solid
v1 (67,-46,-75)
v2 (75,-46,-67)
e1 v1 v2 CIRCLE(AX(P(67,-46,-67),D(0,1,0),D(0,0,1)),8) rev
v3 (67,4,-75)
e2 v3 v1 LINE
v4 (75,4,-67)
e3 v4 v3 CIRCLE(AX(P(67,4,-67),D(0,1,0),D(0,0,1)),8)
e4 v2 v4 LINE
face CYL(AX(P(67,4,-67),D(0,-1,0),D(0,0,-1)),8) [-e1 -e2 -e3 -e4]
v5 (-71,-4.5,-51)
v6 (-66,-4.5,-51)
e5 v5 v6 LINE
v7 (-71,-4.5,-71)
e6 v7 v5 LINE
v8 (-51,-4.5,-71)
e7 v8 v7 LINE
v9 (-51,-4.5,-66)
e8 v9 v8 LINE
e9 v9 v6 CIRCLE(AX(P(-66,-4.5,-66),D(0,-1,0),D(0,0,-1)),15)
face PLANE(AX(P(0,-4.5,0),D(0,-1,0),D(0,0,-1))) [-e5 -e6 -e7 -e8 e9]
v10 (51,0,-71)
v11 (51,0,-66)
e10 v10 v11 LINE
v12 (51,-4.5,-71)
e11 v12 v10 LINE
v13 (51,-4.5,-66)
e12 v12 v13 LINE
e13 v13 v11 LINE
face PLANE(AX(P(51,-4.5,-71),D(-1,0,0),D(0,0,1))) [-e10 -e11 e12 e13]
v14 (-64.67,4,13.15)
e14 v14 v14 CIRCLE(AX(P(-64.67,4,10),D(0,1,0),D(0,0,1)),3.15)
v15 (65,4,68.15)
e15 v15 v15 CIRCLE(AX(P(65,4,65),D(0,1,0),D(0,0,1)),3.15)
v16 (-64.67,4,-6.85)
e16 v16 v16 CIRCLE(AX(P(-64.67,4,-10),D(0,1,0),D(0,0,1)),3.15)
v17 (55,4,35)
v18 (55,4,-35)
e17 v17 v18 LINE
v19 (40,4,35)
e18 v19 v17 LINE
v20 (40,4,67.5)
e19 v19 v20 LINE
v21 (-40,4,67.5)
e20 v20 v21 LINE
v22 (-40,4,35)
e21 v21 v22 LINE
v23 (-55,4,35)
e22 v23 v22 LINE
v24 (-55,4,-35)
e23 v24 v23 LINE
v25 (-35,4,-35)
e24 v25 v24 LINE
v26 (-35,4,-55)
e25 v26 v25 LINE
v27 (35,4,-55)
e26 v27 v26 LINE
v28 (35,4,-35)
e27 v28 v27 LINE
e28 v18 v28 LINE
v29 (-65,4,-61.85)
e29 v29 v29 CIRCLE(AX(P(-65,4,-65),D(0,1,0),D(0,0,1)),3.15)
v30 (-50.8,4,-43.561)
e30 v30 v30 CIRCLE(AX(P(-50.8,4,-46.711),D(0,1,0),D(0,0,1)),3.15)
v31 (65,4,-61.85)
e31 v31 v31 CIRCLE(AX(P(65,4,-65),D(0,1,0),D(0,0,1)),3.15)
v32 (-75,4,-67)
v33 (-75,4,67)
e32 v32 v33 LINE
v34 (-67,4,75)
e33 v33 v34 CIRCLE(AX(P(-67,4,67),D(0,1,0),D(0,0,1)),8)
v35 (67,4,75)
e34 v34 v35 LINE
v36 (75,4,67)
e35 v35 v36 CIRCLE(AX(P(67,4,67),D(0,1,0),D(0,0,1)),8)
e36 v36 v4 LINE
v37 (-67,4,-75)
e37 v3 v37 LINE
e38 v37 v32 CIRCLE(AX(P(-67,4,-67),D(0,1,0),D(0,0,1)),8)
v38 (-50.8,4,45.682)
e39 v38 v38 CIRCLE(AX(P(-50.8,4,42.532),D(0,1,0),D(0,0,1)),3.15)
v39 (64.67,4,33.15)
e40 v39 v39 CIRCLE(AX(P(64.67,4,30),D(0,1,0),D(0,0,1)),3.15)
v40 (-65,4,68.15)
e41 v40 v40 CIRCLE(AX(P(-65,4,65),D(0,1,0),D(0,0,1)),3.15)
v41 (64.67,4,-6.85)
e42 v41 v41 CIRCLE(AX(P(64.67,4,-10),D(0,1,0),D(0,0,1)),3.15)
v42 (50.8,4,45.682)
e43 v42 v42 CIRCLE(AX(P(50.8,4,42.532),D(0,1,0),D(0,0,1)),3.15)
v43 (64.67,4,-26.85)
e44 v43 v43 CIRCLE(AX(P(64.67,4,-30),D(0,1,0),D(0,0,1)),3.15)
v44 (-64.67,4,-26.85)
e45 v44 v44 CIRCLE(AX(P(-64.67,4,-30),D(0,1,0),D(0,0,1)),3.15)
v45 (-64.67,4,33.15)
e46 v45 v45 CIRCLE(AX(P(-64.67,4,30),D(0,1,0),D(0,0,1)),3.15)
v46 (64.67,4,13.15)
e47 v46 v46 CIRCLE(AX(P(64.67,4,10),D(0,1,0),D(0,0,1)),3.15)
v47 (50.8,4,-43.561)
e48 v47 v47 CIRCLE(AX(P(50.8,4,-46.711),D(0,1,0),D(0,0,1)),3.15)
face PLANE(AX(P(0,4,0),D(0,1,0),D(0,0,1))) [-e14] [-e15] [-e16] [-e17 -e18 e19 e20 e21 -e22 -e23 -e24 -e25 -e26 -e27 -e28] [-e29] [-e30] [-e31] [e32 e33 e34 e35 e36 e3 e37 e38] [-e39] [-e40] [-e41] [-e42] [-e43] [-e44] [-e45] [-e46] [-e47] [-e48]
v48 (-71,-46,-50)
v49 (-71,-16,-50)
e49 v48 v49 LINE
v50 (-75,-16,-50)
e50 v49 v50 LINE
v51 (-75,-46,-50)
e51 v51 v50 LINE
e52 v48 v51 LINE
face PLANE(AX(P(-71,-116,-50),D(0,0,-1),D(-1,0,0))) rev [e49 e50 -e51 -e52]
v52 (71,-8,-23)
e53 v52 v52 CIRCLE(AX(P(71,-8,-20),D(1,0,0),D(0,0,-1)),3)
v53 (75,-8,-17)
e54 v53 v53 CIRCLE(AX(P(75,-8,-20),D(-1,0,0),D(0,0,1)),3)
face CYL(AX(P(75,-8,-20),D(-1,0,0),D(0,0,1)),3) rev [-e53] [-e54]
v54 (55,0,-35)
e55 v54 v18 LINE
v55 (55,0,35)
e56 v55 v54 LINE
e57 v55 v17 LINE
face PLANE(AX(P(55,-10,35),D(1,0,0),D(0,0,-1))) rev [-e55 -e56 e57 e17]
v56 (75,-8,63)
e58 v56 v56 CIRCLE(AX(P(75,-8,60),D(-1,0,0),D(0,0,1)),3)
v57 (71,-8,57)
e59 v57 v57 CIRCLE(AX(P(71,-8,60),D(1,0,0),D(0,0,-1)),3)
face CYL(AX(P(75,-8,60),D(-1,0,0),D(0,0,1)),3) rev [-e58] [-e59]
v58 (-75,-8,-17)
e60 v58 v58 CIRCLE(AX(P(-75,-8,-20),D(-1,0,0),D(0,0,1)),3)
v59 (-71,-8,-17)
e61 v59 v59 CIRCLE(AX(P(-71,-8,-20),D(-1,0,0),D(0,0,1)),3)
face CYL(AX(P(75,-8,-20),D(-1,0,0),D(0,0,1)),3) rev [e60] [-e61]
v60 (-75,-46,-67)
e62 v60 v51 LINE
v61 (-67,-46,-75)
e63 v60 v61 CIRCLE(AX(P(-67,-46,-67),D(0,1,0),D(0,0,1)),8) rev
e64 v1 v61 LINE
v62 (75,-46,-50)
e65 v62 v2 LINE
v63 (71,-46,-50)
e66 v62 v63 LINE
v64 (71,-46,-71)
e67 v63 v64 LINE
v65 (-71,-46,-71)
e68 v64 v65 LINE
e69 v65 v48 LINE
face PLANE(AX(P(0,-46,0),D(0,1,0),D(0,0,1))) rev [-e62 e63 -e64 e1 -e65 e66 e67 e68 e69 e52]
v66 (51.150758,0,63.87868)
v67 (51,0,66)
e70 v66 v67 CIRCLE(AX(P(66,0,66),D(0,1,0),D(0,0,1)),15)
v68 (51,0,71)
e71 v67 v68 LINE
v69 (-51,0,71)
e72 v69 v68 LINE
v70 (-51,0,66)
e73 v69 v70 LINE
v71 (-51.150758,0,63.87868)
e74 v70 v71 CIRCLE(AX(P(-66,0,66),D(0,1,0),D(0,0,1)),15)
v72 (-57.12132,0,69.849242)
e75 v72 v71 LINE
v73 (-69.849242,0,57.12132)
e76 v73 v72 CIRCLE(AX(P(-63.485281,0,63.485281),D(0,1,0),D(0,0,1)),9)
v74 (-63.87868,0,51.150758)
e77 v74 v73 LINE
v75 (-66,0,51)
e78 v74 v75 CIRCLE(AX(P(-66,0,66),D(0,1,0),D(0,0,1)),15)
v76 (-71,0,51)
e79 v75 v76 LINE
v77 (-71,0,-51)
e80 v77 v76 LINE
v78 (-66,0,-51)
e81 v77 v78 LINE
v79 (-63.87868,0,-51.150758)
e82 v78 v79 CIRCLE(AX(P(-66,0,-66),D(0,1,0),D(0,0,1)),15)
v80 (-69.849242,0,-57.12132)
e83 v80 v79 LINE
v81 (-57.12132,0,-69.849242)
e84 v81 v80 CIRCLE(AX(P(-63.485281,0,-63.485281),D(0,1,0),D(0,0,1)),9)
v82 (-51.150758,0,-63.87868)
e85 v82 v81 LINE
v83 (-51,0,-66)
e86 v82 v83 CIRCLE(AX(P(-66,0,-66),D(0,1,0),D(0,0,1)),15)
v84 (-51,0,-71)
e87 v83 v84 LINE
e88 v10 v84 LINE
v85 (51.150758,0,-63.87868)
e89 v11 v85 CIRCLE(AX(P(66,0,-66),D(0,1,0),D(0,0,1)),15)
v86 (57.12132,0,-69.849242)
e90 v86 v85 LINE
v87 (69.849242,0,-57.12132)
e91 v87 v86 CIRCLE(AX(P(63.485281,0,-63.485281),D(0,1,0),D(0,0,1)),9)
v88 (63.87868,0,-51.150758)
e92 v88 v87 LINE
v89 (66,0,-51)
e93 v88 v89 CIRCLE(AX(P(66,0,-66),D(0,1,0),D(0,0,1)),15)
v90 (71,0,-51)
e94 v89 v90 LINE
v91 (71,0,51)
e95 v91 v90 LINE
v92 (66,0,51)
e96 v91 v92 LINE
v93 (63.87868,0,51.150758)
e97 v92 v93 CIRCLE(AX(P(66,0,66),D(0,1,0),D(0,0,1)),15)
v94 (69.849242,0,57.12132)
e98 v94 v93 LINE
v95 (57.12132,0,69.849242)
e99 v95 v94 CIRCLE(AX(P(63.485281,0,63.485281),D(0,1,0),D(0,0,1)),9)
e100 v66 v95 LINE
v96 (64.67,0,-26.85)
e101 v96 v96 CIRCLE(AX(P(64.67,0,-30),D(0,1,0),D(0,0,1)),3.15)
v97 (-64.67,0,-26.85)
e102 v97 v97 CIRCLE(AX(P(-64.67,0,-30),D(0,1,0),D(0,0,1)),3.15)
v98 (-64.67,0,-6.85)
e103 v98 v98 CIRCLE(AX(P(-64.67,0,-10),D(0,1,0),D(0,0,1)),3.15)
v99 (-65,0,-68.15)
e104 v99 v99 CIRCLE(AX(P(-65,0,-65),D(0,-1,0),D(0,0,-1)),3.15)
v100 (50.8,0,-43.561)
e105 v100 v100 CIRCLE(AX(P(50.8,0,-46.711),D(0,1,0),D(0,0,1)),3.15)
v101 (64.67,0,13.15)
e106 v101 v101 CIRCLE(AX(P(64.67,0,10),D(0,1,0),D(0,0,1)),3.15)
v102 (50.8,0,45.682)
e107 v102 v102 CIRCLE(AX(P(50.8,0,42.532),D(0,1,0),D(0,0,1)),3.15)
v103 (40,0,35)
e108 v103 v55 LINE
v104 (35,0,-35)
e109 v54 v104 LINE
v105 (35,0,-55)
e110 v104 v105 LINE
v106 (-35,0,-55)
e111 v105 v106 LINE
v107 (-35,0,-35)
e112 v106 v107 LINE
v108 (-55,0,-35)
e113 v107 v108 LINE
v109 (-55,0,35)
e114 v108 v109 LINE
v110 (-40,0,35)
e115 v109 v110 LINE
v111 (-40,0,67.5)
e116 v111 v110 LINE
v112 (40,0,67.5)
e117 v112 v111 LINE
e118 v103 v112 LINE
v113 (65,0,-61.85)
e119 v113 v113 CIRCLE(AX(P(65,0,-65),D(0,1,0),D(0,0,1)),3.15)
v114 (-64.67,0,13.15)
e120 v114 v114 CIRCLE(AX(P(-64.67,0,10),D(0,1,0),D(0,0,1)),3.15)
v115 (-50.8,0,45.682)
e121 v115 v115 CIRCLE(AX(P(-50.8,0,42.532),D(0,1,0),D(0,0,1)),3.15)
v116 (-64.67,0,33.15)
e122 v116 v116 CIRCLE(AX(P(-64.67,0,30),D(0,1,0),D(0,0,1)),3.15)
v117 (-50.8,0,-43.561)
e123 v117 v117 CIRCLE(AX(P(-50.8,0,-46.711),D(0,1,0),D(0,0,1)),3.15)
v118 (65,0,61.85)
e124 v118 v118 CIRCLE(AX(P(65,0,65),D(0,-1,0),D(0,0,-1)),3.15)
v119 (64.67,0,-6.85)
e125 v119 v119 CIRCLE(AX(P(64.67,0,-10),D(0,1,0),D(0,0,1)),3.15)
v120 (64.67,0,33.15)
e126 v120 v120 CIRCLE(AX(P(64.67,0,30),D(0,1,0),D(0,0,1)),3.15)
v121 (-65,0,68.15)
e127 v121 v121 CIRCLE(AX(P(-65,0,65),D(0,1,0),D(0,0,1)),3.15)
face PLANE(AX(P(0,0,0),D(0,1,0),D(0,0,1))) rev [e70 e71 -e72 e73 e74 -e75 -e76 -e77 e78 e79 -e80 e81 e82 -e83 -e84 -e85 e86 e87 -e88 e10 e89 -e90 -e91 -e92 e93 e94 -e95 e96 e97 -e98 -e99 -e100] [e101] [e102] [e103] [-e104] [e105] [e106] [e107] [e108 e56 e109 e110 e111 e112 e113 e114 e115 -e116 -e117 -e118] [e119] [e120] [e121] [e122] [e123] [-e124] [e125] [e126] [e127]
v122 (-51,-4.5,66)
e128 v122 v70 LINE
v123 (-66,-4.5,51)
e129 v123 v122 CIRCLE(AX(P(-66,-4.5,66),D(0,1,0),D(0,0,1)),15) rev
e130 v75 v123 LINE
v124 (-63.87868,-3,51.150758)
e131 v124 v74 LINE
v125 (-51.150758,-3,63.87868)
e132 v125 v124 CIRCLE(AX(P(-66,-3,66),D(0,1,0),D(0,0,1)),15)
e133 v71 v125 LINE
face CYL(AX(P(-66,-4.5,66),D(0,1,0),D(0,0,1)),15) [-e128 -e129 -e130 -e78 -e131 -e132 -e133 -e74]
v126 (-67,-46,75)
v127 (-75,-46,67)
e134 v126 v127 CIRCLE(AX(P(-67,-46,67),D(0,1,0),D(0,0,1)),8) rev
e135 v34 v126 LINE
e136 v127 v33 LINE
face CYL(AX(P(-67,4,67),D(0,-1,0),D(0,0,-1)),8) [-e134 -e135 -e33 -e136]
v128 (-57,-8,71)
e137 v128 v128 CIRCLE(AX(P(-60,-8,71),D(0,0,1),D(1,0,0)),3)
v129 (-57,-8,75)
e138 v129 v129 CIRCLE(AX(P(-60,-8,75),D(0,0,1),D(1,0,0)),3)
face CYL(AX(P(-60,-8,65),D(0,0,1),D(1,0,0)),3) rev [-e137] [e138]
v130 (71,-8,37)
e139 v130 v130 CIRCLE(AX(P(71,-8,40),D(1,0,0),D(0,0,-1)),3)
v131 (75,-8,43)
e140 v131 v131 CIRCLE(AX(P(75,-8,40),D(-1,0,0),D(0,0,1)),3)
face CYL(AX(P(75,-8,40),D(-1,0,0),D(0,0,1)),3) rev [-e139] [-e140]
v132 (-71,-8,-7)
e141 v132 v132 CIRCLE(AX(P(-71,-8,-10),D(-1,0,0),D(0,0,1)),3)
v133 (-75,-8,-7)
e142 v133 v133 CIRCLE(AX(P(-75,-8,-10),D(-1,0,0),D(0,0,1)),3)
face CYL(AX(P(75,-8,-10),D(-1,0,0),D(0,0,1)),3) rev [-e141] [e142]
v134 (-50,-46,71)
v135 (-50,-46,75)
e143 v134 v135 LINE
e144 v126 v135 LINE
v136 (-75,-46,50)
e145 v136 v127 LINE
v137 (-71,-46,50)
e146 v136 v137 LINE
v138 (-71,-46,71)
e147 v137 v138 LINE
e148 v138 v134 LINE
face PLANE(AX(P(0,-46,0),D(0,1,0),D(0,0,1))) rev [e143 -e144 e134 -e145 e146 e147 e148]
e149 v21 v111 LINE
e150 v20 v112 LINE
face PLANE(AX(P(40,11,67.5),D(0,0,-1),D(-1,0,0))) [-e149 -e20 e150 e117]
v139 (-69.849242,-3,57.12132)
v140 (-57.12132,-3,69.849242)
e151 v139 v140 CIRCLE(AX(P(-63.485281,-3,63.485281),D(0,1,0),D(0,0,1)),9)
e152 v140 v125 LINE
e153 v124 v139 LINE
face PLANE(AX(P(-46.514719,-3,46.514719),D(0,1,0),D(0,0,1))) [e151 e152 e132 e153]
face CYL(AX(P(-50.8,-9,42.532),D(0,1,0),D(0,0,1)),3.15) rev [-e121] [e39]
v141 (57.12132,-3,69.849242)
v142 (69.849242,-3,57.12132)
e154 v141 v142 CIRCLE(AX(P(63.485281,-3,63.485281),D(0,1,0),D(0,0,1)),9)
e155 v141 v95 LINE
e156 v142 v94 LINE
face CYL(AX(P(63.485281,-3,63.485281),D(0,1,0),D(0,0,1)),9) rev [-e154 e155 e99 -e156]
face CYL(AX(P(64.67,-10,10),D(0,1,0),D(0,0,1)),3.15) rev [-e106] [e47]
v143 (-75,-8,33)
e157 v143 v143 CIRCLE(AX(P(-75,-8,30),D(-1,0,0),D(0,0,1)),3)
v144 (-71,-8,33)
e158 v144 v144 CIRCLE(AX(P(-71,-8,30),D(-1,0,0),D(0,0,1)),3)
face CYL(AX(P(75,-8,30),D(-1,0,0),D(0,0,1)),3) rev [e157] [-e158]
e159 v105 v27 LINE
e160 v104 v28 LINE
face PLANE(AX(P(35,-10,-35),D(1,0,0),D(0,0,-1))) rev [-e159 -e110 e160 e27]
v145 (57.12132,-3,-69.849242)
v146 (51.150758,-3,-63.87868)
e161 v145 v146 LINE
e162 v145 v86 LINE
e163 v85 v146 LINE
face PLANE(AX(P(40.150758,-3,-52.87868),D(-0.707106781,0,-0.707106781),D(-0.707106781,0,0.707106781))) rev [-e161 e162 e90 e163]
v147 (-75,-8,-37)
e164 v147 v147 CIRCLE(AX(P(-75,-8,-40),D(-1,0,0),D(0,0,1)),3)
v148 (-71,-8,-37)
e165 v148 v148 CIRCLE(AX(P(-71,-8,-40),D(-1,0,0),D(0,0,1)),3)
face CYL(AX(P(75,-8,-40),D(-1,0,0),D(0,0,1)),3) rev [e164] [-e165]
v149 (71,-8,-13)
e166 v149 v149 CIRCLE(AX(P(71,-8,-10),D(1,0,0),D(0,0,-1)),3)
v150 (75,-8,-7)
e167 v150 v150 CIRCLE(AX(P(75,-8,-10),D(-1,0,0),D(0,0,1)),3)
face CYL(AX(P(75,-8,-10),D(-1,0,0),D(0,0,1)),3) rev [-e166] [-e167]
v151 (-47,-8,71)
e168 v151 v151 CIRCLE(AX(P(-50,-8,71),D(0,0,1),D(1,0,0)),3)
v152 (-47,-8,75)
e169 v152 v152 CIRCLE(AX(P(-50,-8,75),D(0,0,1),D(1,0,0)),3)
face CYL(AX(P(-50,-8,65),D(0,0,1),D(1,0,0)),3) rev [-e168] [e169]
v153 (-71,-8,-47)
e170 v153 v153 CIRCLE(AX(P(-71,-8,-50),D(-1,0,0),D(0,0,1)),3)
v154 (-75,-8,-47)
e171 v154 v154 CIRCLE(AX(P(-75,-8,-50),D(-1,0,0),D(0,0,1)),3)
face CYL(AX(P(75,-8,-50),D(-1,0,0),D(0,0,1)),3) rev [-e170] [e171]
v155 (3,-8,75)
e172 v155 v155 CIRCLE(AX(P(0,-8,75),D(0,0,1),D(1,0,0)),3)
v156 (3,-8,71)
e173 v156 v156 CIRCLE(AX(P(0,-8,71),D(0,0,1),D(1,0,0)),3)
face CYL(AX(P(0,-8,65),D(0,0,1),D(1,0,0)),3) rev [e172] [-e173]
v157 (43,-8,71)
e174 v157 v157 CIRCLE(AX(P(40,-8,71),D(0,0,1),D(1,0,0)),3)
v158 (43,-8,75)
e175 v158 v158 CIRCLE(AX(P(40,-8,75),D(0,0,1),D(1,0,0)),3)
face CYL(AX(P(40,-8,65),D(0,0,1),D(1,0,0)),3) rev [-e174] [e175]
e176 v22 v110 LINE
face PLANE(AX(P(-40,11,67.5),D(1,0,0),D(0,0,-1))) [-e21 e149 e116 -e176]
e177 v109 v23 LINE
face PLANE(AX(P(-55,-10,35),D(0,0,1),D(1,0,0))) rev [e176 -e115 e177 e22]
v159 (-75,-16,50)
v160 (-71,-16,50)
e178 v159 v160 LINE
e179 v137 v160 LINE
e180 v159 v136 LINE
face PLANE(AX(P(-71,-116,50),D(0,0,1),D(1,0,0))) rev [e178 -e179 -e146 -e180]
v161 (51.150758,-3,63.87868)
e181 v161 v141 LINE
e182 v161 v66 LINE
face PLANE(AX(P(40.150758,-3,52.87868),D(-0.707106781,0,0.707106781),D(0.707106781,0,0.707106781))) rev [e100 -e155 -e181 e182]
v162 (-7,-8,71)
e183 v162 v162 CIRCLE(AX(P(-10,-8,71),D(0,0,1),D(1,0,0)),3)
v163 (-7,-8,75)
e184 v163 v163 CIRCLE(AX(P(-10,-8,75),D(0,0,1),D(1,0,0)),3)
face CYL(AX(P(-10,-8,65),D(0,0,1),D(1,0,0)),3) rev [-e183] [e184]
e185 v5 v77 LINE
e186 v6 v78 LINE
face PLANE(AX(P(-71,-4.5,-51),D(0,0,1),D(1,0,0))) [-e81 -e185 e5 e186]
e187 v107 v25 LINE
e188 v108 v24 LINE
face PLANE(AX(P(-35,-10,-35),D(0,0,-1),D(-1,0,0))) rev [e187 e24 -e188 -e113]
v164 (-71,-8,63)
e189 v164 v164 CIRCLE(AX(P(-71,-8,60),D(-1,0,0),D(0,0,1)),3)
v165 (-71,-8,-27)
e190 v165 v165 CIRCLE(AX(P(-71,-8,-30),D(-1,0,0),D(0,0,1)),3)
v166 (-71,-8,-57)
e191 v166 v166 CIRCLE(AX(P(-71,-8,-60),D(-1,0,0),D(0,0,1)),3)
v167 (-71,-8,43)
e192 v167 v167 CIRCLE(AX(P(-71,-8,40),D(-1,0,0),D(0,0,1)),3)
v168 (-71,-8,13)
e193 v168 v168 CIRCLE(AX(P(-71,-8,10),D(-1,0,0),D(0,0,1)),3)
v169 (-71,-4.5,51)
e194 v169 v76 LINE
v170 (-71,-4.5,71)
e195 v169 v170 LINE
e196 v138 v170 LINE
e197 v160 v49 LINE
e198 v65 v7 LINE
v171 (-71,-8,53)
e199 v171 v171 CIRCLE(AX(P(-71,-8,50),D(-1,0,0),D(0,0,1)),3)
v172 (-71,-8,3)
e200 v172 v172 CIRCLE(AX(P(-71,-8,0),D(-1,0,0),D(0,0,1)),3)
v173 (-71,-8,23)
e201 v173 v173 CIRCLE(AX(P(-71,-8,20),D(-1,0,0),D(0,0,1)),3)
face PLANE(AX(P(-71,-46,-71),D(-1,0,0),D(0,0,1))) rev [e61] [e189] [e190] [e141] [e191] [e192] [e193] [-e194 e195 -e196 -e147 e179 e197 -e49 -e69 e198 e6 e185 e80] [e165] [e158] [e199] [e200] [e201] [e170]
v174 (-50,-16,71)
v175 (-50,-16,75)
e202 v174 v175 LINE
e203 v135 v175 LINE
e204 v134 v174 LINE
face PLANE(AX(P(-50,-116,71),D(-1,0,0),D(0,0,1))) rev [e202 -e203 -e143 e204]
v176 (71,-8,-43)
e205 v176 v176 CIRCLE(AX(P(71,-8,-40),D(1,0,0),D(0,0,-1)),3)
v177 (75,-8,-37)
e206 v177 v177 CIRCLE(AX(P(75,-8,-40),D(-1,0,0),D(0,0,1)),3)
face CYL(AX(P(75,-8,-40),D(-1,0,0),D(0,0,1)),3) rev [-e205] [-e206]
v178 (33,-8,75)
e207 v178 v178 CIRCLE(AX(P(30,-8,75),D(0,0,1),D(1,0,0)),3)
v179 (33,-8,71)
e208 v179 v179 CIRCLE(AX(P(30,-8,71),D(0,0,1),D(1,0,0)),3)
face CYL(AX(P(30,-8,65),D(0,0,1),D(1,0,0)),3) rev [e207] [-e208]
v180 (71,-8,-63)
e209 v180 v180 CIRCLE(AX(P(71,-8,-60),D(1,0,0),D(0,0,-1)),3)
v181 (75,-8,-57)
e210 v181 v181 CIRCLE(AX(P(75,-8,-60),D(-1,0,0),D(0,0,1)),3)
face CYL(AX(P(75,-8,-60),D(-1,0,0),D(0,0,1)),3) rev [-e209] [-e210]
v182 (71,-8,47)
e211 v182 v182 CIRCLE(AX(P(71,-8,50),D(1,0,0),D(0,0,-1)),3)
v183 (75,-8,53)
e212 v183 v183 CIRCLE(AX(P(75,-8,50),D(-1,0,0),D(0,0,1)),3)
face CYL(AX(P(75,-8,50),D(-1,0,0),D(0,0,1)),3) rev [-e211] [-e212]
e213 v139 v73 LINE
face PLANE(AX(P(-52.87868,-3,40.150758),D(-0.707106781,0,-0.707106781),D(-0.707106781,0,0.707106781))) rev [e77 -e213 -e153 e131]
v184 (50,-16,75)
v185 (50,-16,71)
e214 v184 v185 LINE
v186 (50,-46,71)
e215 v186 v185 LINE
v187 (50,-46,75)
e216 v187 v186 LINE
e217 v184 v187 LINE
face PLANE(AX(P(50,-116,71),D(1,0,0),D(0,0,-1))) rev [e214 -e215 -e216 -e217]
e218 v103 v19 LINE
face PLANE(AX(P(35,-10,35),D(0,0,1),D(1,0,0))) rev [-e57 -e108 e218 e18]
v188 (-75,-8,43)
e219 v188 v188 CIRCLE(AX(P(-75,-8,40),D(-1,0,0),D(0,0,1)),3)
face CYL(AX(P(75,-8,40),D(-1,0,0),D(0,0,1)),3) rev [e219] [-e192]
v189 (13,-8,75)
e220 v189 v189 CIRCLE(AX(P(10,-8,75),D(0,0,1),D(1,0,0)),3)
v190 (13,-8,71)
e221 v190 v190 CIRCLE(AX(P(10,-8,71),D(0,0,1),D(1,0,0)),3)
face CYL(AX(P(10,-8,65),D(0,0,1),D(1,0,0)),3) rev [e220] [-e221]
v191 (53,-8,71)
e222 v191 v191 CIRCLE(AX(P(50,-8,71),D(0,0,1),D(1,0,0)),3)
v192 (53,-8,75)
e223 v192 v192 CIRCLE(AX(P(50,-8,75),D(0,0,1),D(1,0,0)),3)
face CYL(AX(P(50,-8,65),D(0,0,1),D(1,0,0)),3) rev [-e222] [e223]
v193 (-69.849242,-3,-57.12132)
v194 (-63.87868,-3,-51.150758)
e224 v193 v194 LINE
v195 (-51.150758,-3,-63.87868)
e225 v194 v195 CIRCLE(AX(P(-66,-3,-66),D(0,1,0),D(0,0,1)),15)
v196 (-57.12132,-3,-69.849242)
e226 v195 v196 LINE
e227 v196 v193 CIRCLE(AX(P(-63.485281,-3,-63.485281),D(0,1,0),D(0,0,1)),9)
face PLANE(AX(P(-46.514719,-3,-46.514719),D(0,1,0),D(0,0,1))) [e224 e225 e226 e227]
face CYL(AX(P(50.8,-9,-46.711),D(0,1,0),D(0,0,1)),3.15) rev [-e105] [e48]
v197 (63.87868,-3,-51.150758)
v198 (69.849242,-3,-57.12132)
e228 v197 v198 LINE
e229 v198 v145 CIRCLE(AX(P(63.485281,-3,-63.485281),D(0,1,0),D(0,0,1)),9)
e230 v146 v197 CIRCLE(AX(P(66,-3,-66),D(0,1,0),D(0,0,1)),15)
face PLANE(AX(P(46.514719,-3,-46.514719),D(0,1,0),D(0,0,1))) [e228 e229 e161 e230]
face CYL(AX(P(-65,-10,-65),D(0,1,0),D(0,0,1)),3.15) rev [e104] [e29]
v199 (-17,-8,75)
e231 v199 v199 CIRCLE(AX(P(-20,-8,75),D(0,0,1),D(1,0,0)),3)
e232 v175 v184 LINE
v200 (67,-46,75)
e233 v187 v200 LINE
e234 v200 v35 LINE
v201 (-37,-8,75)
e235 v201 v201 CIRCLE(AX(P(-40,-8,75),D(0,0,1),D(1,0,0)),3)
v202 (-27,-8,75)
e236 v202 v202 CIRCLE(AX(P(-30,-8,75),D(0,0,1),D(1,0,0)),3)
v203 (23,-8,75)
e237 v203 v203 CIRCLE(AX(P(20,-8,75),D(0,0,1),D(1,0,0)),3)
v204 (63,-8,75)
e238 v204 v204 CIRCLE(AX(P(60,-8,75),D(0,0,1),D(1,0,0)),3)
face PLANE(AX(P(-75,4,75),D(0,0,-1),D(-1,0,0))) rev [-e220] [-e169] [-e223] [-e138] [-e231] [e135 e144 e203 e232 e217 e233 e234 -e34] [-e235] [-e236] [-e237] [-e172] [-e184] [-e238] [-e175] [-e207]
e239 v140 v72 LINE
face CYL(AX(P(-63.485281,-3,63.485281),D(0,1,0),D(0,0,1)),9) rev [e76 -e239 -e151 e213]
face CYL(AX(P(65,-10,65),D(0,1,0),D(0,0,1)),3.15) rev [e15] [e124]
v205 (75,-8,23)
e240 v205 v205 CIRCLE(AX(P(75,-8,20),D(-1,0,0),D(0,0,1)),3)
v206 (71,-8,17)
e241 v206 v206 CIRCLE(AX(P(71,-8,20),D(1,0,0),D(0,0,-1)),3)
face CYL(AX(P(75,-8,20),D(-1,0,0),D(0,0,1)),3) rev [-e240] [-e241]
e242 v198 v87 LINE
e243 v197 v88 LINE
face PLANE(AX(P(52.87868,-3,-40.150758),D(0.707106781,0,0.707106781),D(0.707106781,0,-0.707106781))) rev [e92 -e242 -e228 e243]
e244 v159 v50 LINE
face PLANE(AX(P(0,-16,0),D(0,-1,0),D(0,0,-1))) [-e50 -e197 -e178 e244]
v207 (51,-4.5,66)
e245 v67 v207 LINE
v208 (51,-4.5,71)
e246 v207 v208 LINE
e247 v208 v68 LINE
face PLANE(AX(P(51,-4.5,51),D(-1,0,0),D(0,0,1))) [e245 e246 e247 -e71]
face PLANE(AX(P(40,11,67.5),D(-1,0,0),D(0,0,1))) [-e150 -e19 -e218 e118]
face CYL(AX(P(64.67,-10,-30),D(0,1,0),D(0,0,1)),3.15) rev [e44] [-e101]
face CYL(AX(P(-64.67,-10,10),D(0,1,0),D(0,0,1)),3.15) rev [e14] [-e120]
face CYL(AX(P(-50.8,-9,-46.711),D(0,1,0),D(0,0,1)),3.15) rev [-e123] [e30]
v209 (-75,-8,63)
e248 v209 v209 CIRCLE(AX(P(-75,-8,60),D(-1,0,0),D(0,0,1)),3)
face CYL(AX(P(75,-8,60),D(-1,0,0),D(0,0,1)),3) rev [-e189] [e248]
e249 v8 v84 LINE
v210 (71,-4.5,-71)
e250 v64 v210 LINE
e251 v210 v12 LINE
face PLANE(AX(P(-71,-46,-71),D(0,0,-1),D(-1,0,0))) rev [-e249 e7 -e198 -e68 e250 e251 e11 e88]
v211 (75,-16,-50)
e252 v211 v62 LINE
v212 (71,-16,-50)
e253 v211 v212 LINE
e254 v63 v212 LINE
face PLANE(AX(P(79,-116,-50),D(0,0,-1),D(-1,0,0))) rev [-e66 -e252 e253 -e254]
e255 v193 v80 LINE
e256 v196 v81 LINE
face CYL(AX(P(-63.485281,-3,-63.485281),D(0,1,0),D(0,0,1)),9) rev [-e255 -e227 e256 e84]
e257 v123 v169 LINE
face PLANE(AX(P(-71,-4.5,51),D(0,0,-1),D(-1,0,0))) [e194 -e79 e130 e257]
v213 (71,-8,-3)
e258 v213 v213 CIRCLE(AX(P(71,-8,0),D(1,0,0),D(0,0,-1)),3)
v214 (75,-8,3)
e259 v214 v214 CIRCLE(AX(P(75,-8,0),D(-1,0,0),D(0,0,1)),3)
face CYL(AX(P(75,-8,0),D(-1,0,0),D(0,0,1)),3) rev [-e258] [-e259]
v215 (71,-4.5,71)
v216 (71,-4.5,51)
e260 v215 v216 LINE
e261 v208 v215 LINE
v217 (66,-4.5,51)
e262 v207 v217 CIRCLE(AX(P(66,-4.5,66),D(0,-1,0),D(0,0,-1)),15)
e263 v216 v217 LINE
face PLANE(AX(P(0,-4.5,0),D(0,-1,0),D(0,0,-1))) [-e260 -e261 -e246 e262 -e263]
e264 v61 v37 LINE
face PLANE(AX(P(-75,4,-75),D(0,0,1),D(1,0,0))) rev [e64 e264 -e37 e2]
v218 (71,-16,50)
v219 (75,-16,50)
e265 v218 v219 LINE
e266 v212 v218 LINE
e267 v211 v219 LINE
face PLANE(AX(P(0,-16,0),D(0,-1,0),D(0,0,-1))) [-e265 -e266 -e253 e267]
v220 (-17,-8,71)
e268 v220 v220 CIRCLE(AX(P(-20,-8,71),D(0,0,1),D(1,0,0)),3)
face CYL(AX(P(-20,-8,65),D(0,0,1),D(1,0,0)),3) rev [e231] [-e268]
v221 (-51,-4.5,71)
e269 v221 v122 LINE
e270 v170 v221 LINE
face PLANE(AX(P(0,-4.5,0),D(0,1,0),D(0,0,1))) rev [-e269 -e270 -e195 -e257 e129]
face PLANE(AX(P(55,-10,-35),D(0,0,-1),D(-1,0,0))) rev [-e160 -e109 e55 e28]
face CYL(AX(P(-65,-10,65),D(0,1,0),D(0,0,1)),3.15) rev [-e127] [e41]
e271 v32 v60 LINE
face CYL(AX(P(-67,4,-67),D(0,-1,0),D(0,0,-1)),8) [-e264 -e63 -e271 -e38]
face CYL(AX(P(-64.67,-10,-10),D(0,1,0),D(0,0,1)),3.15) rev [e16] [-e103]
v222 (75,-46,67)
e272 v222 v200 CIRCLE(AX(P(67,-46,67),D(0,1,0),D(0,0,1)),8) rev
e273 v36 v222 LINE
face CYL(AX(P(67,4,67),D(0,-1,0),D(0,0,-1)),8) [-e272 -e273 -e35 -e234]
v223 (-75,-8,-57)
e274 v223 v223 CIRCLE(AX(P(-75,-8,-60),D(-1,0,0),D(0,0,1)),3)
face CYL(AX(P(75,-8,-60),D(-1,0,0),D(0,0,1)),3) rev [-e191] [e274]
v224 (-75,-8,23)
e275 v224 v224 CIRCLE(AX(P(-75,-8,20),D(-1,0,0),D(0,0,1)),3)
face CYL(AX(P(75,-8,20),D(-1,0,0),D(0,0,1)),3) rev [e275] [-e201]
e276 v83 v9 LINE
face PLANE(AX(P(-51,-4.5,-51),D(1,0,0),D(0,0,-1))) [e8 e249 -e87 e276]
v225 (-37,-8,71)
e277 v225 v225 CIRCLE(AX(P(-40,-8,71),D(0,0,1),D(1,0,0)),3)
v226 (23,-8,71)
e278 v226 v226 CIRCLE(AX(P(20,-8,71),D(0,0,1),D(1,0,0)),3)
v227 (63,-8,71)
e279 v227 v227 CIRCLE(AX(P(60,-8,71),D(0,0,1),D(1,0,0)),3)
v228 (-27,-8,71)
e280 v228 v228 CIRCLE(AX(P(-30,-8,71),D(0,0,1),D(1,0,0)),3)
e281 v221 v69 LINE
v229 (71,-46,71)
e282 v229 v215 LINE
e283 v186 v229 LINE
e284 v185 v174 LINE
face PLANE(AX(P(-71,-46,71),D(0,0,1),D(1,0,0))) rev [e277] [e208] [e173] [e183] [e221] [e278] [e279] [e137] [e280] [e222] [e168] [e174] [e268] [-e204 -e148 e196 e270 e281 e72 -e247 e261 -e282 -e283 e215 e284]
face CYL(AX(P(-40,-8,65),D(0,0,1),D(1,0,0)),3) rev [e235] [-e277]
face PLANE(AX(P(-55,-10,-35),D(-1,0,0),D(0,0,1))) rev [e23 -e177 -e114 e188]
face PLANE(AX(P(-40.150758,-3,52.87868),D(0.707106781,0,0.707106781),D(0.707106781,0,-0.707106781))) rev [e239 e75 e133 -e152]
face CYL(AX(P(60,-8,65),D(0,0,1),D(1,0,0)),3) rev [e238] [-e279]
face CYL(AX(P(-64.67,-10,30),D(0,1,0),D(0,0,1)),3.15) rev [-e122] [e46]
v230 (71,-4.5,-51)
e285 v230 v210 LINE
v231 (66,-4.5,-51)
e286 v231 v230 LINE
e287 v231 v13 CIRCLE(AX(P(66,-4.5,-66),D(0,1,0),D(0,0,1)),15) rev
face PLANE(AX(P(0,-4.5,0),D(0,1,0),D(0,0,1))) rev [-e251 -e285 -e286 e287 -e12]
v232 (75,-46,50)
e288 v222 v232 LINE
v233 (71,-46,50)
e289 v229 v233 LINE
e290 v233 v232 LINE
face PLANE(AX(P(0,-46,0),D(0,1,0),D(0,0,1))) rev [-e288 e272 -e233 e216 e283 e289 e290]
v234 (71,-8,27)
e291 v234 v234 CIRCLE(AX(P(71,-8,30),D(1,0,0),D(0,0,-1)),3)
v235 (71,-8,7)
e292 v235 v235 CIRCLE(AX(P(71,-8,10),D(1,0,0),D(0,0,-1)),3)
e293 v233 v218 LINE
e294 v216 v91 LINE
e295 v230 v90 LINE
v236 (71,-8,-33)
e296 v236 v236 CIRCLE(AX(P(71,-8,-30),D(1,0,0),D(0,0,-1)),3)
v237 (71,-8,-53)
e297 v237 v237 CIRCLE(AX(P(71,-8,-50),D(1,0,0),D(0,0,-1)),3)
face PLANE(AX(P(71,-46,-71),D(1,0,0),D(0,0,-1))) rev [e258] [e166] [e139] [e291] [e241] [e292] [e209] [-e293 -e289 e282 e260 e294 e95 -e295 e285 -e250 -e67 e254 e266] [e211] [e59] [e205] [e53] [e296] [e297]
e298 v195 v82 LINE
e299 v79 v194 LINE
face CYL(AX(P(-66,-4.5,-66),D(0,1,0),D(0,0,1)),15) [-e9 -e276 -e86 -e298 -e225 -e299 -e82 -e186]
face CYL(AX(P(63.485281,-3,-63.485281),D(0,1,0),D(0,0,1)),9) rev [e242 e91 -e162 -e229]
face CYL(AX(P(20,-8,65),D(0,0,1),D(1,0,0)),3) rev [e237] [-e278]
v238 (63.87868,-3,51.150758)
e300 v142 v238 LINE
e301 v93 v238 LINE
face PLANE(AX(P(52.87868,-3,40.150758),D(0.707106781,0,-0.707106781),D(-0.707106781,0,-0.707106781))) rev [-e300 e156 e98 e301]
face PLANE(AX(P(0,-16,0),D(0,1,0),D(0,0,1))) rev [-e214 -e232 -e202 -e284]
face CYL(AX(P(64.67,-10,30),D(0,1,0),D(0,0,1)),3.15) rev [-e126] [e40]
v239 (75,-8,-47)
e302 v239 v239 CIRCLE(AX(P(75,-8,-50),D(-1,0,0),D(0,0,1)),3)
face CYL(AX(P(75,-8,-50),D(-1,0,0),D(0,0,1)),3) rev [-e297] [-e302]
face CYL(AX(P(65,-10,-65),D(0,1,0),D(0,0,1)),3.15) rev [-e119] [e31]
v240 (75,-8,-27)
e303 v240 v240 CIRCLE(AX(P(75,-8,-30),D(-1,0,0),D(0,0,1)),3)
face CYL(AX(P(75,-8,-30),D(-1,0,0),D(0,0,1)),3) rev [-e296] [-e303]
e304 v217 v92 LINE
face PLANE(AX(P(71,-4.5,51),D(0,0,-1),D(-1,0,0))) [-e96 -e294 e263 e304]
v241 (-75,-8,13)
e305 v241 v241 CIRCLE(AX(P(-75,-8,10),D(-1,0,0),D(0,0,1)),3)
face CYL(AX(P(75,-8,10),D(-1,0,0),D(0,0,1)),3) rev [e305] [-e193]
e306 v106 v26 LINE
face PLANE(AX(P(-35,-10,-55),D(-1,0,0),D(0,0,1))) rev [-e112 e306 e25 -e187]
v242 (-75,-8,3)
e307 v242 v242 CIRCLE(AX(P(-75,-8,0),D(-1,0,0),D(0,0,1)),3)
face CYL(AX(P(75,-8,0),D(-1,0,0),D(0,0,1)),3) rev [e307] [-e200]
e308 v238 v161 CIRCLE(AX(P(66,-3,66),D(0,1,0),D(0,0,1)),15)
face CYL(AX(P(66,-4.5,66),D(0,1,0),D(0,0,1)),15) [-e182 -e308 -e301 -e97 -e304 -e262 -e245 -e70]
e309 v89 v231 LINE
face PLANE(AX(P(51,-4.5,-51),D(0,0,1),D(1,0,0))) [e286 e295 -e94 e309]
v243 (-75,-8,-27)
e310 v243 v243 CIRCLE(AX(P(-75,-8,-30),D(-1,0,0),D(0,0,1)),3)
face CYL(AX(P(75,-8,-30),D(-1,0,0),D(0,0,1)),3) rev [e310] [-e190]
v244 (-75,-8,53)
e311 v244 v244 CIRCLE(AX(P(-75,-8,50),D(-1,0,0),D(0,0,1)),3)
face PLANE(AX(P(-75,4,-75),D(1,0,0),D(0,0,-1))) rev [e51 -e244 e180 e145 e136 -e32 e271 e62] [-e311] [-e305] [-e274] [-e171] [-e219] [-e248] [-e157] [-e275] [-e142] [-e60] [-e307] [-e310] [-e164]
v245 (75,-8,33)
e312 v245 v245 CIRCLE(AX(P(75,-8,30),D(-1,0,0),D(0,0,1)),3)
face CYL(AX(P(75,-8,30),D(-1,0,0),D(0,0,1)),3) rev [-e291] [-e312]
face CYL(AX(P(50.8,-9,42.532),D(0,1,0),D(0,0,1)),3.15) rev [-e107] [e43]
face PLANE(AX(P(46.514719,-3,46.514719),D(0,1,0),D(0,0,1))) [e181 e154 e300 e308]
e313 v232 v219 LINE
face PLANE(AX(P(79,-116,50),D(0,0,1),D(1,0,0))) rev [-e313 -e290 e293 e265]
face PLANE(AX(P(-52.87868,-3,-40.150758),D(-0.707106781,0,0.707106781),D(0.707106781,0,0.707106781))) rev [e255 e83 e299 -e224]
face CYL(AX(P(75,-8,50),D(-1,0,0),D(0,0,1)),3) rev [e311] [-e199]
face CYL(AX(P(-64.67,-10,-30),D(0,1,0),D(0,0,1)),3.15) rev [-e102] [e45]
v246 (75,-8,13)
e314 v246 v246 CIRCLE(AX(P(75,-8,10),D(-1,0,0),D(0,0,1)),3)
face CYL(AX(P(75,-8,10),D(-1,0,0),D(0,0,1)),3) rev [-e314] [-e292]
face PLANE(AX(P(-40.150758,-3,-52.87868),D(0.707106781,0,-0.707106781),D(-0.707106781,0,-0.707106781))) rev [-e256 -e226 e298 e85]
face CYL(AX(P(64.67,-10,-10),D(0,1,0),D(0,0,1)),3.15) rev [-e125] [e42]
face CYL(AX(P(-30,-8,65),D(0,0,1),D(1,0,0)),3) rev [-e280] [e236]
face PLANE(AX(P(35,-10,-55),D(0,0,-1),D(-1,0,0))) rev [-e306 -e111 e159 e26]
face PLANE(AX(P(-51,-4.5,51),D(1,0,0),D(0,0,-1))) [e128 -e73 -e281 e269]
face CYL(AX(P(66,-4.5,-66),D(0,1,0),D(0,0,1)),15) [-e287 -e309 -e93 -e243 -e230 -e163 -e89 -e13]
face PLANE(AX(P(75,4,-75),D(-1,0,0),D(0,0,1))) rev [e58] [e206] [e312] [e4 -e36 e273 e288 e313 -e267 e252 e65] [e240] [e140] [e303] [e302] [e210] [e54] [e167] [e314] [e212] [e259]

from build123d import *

# Parameters (mm, degrees)
SKETCH9_R                 = 3.15
BOSS_EXTRUDE10_DEPTH      = 10
BOSS_EXTRUDE10_2_DEPTH    = 10
BOSS_EXTRUDE10_3_DEPTH    = 10
BOSS_EXTRUDE10_4_DEPTH    = 10
BOSS_EXTRUDE10_5_DEPTH    = 10
BOSS_EXTRUDE10_6_DEPTH    = 10
BOSS_EXTRUDE10_7_DEPTH    = 10
BOSS_EXTRUDE10_8_DEPTH    = 10
BOSS_EXTRUDE12_DEPTH      = 10
SKETCH15_R                = 3.15
BOSS_EXTRUDE17_DEPTH      = 10
BOSS_EXTRUDE17_2_DEPTH    = 10
BOSS_EXTRUDE17_3_DEPTH    = 10
BOSS_EXTRUDE17_4_DEPTH    = 10
SKETCH22_W                = 150
SKETCH22_H                = 150
BOSS_EXTRUDE19_DEPTH      = 4
SKETCH29_W                = 150
SKETCH29_H                = 150
SKETCH29_W_2              = 142
SKETCH29_H_2              = 142
BOSS_EXTRUDE20_DEPTH      = 50
FILLET12_R                = 8
BOSS_EXTRUDE21_START      = -20
SKETCH31_W                = 8
SKETCH31_H                = 100
BOSS_EXTRUDE21_DEPTH      = 100
BOSS_EXTRUDE21_2_DEPTH    = 100
SKETCH31_W_2              = 100
SKETCH31_H_2              = 8
BOSS_EXTRUDE21_3_DEPTH    = 100
SKETCH35_R                = 3.15
BOSS_EXTRUDE25_DEPTH      = 10
BOSS_EXTRUDE25_2_DEPTH    = 10
BOSS_EXTRUDE25_3_DEPTH    = 10
BOSS_EXTRUDE25_4_DEPTH    = 10
BOSS_EXTRUDE27_DEPTH      = 11
BOSS_EXTRUDE27_DEPTH_BACK = 46
SKETCH38_W                = 80
SKETCH38_H                = 35.561756734
BOSS_EXTRUDE28_DEPTH      = 3
BOSS_EXTRUDE28_2_DEPTH    = 3
BOSS_EXTRUDE28_3_DEPTH    = 3
BOSS_EXTRUDE28_4_DEPTH    = 3
SKETCH40_W                = 20
SKETCH40_H                = 20
BOSS_EXTRUDE31_DEPTH      = 4.5
BOSS_EXTRUDE31_2_DEPTH    = 4.5
BOSS_EXTRUDE31_3_DEPTH    = 4.5
BOSS_EXTRUDE31_4_DEPTH    = 4.5
FILLET14_R                = 15
SKETCH42_R                = 3
CUT_EXTRUDE1_DEPTH        = 10
SKETCH45_R                = 3
CUT_EXTRUDE2_DEPTH        = 174.899396204


with BuildPart() as part:
    # Sketch9 → Boss-Extrude10 (new, symmetric)
    with BuildSketch(Plane(origin=(0, 0, 0), x_dir=(1, 0, 0), z_dir=(0, 1, 0))):
        with Locations(Location((64.67, -30, 0), (0, 0, 270))):
            Circle(SKETCH9_R)
    extrude(amount=BOSS_EXTRUDE10_DEPTH, both=True)


with BuildPart() as body_2:
    # Sketch9 → Boss-Extrude10 2 (new, symmetric)
    with BuildSketch(Plane(origin=(0, 0, 0), x_dir=(1, 0, 0), z_dir=(0, 1, 0))):
        with Locations(Location((-64.67, -30, 0), (0, 0, 270))):
            Circle(SKETCH9_R)
    extrude(amount=BOSS_EXTRUDE10_2_DEPTH, both=True)


with BuildPart() as body_3:
    # Sketch9 → Boss-Extrude10 3 (new, symmetric)
    with BuildSketch(Plane(origin=(0, 0, 0), x_dir=(1, 0, 0), z_dir=(0, 1, 0))):
        with Locations(Location((64.67, -10, 0), (0, 0, 270))):
            Circle(SKETCH9_R)
    extrude(amount=BOSS_EXTRUDE10_3_DEPTH, both=True)


with BuildPart() as body_4:
    # Sketch9 → Boss-Extrude10 4 (new, symmetric)
    with BuildSketch(Plane(origin=(0, 0, 0), x_dir=(1, 0, 0), z_dir=(0, 1, 0))):
        with Locations(Location((-64.67, -10, 0), (0, 0, 270))):
            Circle(SKETCH9_R)
    extrude(amount=BOSS_EXTRUDE10_4_DEPTH, both=True)


with BuildPart() as body_5:
    # Sketch9 → Boss-Extrude10 5 (new, symmetric)
    with BuildSketch(Plane(origin=(0, 0, 0), x_dir=(1, 0, 0), z_dir=(0, 1, 0))):
        with Locations(Location((64.67, 10, 0), (0, 0, 270))):
            Circle(SKETCH9_R)
    extrude(amount=BOSS_EXTRUDE10_5_DEPTH, both=True)


with BuildPart() as body_6:
    # Sketch9 → Boss-Extrude10 6 (new, symmetric)
    with BuildSketch(Plane(origin=(0, 0, 0), x_dir=(1, 0, 0), z_dir=(0, 1, 0))):
        with Locations(Location((-64.67, 10, 0), (0, 0, 270))):
            Circle(SKETCH9_R)
    extrude(amount=BOSS_EXTRUDE10_6_DEPTH, both=True)


with BuildPart() as body_7:
    # Sketch9 → Boss-Extrude10 7 (new, symmetric)
    with BuildSketch(Plane(origin=(0, 0, 0), x_dir=(1, 0, 0), z_dir=(0, 1, 0))):
        with Locations(Location((64.67, 30, 0), (0, 0, 270))):
            Circle(SKETCH9_R)
    extrude(amount=BOSS_EXTRUDE10_7_DEPTH, both=True)


with BuildPart() as body_8:
    # Sketch9 → Boss-Extrude10 8 (new, symmetric)
    with BuildSketch(Plane(origin=(0, 0, 0), x_dir=(1, 0, 0), z_dir=(0, 1, 0))):
        with Locations(Location((-64.67, 30, 0), (0, 0, 270))):
            Circle(SKETCH9_R)
    extrude(amount=BOSS_EXTRUDE10_8_DEPTH, both=True)


with BuildPart() as body_9:
    # Sketch10 → Boss-Extrude12 (new, symmetric)
    with BuildSketch(Plane(origin=(0, 0, 0), x_dir=(1, 0, 0), z_dir=(0, 1, 0))):
        Polygon((35, -55), (35, -35), (55, -35), (55, 35), (35, 35), (35, 55), (-35, 55), (-35, 35), (-55, 35), (-55, -35), (-35, -35), (-35, -55), align=None)
    extrude(amount=BOSS_EXTRUDE12_DEPTH, both=True)


with BuildPart() as body_10:
    # Sketch15 → Boss-Extrude17 (new, symmetric)
    with BuildSketch(Plane(origin=(0, 0, 0), x_dir=(1, 0, 0), z_dir=(0, 1, 0))):
        with Locations(Location((-50.8, 46.711, 0), (0, 0, 270))):
            Circle(SKETCH15_R)
    extrude(amount=BOSS_EXTRUDE17_DEPTH, both=True)


with BuildPart() as body_11:
    # Sketch15 → Boss-Extrude17 2 (new, symmetric)
    with BuildSketch(Plane(origin=(0, 0, 0), x_dir=(1, 0, 0), z_dir=(0, 1, 0))):
        with Locations(Location((50.8, -42.532, 0), (0, 0, 270))):
            Circle(SKETCH15_R)
    extrude(amount=BOSS_EXTRUDE17_2_DEPTH, both=True)


with BuildPart() as body_12:
    # Sketch15 → Boss-Extrude17 3 (new, symmetric)
    with BuildSketch(Plane(origin=(0, 0, 0), x_dir=(1, 0, 0), z_dir=(0, 1, 0))):
        with Locations(Location((-50.8, -42.532, 0), (0, 0, 270))):
            Circle(SKETCH15_R)
    extrude(amount=BOSS_EXTRUDE17_3_DEPTH, both=True)


with BuildPart() as body_13:
    # Sketch15 → Boss-Extrude17 4 (new, symmetric)
    with BuildSketch(Plane(origin=(0, 0, 0), x_dir=(1, 0, 0), z_dir=(0, 1, 0))):
        with Locations(Location((50.8, 46.711, 0), (0, 0, 270))):
            Circle(SKETCH15_R)
    extrude(amount=BOSS_EXTRUDE17_4_DEPTH, both=True)


with BuildPart() as body_10_1:
    # Body-Move/Copy4: moved
    add(body_10.part.moved(Location((0, 1, 0))))


with BuildPart() as body_13_1:
    # Body-Move/Copy4: moved
    add(body_13.part.moved(Location((0, 1, 0))))


with BuildPart() as body_12_1:
    # Body-Move/Copy4: moved
    add(body_12.part.moved(Location((0, 1, 0))))


with BuildPart() as body_11_1:
    # Body-Move/Copy4: moved
    add(body_11.part.moved(Location((0, 1, 0))))


with BuildPart() as body_14:
    # Sketch22 → Boss-Extrude19 (new body)
    with BuildSketch(Plane(origin=(0, 0, 0), x_dir=(1, 0, 0), z_dir=(0, 1, 0))):
        Rectangle(SKETCH22_W, SKETCH22_H)
    extrude(amount=BOSS_EXTRUDE19_DEPTH)

    # Sketch29 → Boss-Extrude20 (add)
    with BuildSketch(Plane(origin=(0, 4, 0), x_dir=(1, 0, 0), z_dir=(0, 1, 0))):
        Rectangle(SKETCH29_W, SKETCH29_H)
        Rectangle(SKETCH29_W_2, SKETCH29_H_2, mode=Mode.SUBTRACT)
    extrude(amount=-BOSS_EXTRUDE20_DEPTH)

    # Fillet12
    fillet12_edges = [body_14.edges().sort_by_distance(p)[0] for p in [
        (75, -21, 75),
        (-75, -21, 75),
        (-75, -21, -75),
        (75, -21, -75),
    ]]
    fillet(fillet12_edges, radius=FILLET12_R)


with BuildPart() as body_15:
    # Sketch31 → Boss-Extrude21 (new body)
    with BuildSketch(Plane(origin=(0, 4, 0), x_dir=(1, 0, 0), z_dir=(0, 1, 0)).offset(BOSS_EXTRUDE21_START)):
        with Locations((-75, 0)):
            Rectangle(SKETCH31_W, SKETCH31_H)
    extrude(amount=-BOSS_EXTRUDE21_DEPTH)


with BuildPart() as body_16:
    # Sketch31 → Boss-Extrude21 2 (new body)
    with BuildSketch(Plane(origin=(0, 4, 0), x_dir=(1, 0, 0), z_dir=(0, 1, 0)).offset(BOSS_EXTRUDE21_START)):
        with Locations((75, 0)):
            Rectangle(SKETCH31_W, SKETCH31_H)
    extrude(amount=-BOSS_EXTRUDE21_2_DEPTH)


with BuildPart() as body_17:
    # Sketch31 → Boss-Extrude21 3 (new body)
    with BuildSketch(Plane(origin=(0, 4, 0), x_dir=(1, 0, 0), z_dir=(0, 1, 0)).offset(BOSS_EXTRUDE21_START)):
        with Locations((0, -75)):
            Rectangle(SKETCH31_W_2, SKETCH31_H_2)
    extrude(amount=-BOSS_EXTRUDE21_3_DEPTH)


with BuildPart() as body_14_1:
    add(body_14.part)

    # Combine4: cut body 15, body 16, body 17
    add(body_15.part, mode=Mode.SUBTRACT)
    add(body_16.part, mode=Mode.SUBTRACT)
    add(body_17.part, mode=Mode.SUBTRACT)


with BuildPart() as body_15_2:
    # Sketch35 → Boss-Extrude25 (new, symmetric)
    with BuildSketch(Plane(origin=(0, 0, 0), x_dir=(1, 0, 0), z_dir=(0, 1, 0))):
        with Locations(Location((65, -65, 0), (0, 0, 270))):
            Circle(SKETCH35_R)
    extrude(amount=BOSS_EXTRUDE25_DEPTH, both=True)


with BuildPart() as body_16_2:
    # Sketch35 → Boss-Extrude25 2 (new, symmetric)
    with BuildSketch(Plane(origin=(0, 0, 0), x_dir=(1, 0, 0), z_dir=(0, 1, 0))):
        with Locations(Location((-65, 65, 0), (0, 0, 270))):
            Circle(SKETCH35_R)
    extrude(amount=BOSS_EXTRUDE25_2_DEPTH, both=True)


with BuildPart() as body_17_2:
    # Sketch35 → Boss-Extrude25 3 (new, symmetric)
    with BuildSketch(Plane(origin=(0, 0, 0), x_dir=(1, 0, 0), z_dir=(0, 1, 0))):
        with Locations(Location((-65, -65, 0), (0, 0, 270))):
            Circle(SKETCH35_R)
    extrude(amount=BOSS_EXTRUDE25_3_DEPTH, both=True)


with BuildPart() as body_18:
    # Sketch35 → Boss-Extrude25 4 (new, symmetric)
    with BuildSketch(Plane(origin=(0, 0, 0), x_dir=(1, 0, 0), z_dir=(0, 1, 0))):
        with Locations(Location((65, 65, 0), (0, 0, 270))):
            Circle(SKETCH35_R)
    extrude(amount=BOSS_EXTRUDE25_4_DEPTH, both=True)


with BuildPart() as body_19:
    # Sketch38 → Boss-Extrude27 (new, two sides: drawn at the far end of the back side and taken through both)
    with BuildSketch(Plane(origin=(0, 0, 0), x_dir=(1, 0, 0), z_dir=(0, 1, 0)).offset(-BOSS_EXTRUDE27_DEPTH_BACK)):
        with Locations((0, -49.719121633)):
            Rectangle(SKETCH38_W, SKETCH38_H)
    extrude(amount=BOSS_EXTRUDE27_DEPTH + BOSS_EXTRUDE27_DEPTH_BACK)


with BuildPart() as body_14_2:
    add(body_14_1.part)

    # Combine12: cut body 19, body 17 2, body 16 2, body 15 2, body 18
    add(body_19.part, mode=Mode.SUBTRACT)
    add(body_17_2.part, mode=Mode.SUBTRACT)
    add(body_16_2.part, mode=Mode.SUBTRACT)
    add(body_15_2.part, mode=Mode.SUBTRACT)
    add(body_18.part, mode=Mode.SUBTRACT)

    # Combine13: cut body 11, body 12, body 13, body 10, body 9, body 2, part
    add(body_11_1.part, mode=Mode.SUBTRACT)
    add(body_12_1.part, mode=Mode.SUBTRACT)
    add(body_13_1.part, mode=Mode.SUBTRACT)
    add(body_10_1.part, mode=Mode.SUBTRACT)
    add(body_9.part, mode=Mode.SUBTRACT)
    add(body_2.part, mode=Mode.SUBTRACT)
    add(part.part, mode=Mode.SUBTRACT)


with BuildPart() as body_8_2:
    # Sketch36 → Boss-Extrude28 (new body)
    with BuildSketch(Plane(origin=(0, 0, 0), x_dir=(1, 0, 0), z_dir=(0, 1, 0))):
        with BuildLine():
            Line((-40.150757595, -52.878679656), (-57.121320344, -69.849242405))
            ThreePointArc((-57.121320344, -69.849242405), (-69.849242405, -69.849242405), (-69.849242405, -57.121320344))
            Line((-69.849242405, -57.121320344), (-52.878679656, -40.150757595))
            ThreePointArc((-52.878679656, -40.150757595), (-40.150757595, -40.150757595), (-40.150757595, -52.878679656))
        make_face()
    extrude(amount=-BOSS_EXTRUDE28_DEPTH)


with BuildPart() as body_9_2:
    # Sketch36 → Boss-Extrude28 2 (new body)
    with BuildSketch(Plane(origin=(0, 0, 0), x_dir=(1, 0, 0), z_dir=(0, 1, 0))):
        with BuildLine():
            Line((-52.878679656, 40.150757595), (-69.849242405, 57.121320344))
            ThreePointArc((-69.849242405, 57.121320344), (-69.849242405, 69.849242405), (-57.121320344, 69.849242405))
            Line((-57.121320344, 69.849242405), (-40.150757595, 52.878679656))
            ThreePointArc((-40.150757595, 52.878679656), (-40.150757595, 40.150757595), (-52.878679656, 40.150757595))
        make_face()
    extrude(amount=-BOSS_EXTRUDE28_2_DEPTH)


with BuildPart() as body_10_2:
    # Sketch36 → Boss-Extrude28 3 (new body)
    with BuildSketch(Plane(origin=(0, 0, 0), x_dir=(1, 0, 0), z_dir=(0, 1, 0))):
        with BuildLine():
            Line((52.878679656, -40.150757595), (69.849242405, -57.121320344))
            ThreePointArc((69.849242405, -57.121320344), (69.849242405, -69.849242405), (57.121320344, -69.849242405))
            Line((57.121320344, -69.849242405), (40.150757595, -52.878679656))
            ThreePointArc((40.150757595, -52.878679656), (40.150757595, -40.150757595), (52.878679656, -40.150757595))
        make_face()
    extrude(amount=-BOSS_EXTRUDE28_3_DEPTH)


with BuildPart() as body_11_2:
    # Sketch36 → Boss-Extrude28 4 (new body)
    with BuildSketch(Plane(origin=(0, 0, 0), x_dir=(1, 0, 0), z_dir=(0, 1, 0))):
        with BuildLine():
            Line((40.150757595, 52.878679656), (57.121320344, 69.849242405))
            ThreePointArc((57.121320344, 69.849242405), (69.849242405, 69.849242405), (69.849242405, 57.121320344))
            Line((69.849242405, 57.121320344), (52.878679656, 40.150757595))
            ThreePointArc((52.878679656, 40.150757595), (40.150757595, 40.150757595), (40.150757595, 52.878679656))
        make_face()
    extrude(amount=-BOSS_EXTRUDE28_4_DEPTH)


with BuildPart() as body_12_2:
    # Sketch40 → Boss-Extrude31 (new body)
    with BuildSketch(Plane(origin=(0, 0, 0), x_dir=(1, 0, 0), z_dir=(0, 1, 0))):
        with Locations((61, -61)):
            Rectangle(SKETCH40_W, SKETCH40_H)
    extrude(amount=-BOSS_EXTRUDE31_DEPTH)


with BuildPart() as body_13_2:
    # Sketch40 → Boss-Extrude31 2 (new body)
    with BuildSketch(Plane(origin=(0, 0, 0), x_dir=(1, 0, 0), z_dir=(0, 1, 0))):
        with Locations((61, 61)):
            Rectangle(SKETCH40_W, SKETCH40_H)
    extrude(amount=-BOSS_EXTRUDE31_2_DEPTH)


with BuildPart() as body_14_2_1:
    # Sketch40 → Boss-Extrude31 3 (new body)
    with BuildSketch(Plane(origin=(0, 0, 0), x_dir=(1, 0, 0), z_dir=(0, 1, 0))):
        with Locations((-61, 61)):
            Rectangle(SKETCH40_W, SKETCH40_H)
    extrude(amount=-BOSS_EXTRUDE31_3_DEPTH)


with BuildPart() as body_15_3:
    # Sketch40 → Boss-Extrude31 4 (new body)
    with BuildSketch(Plane(origin=(0, 0, 0), x_dir=(1, 0, 0), z_dir=(0, 1, 0))):
        with Locations((-61, -61)):
            Rectangle(SKETCH40_W, SKETCH40_H)
    extrude(amount=-BOSS_EXTRUDE31_4_DEPTH)


with BuildPart() as body_12_2_1:
    add(body_12_2.part)

    # Combine15: union body 13 2, body 14 2, body 15 3, body 14
    add(body_13_2.part)
    add(body_14_2_1.part)
    add(body_15_3.part)
    add(body_14_2.part)

    # Combine16: cut body 11 2, body 10 2, body 9 2, body 8 2
    add(body_11_2.part, mode=Mode.SUBTRACT)
    add(body_10_2.part, mode=Mode.SUBTRACT)
    add(body_9_2.part, mode=Mode.SUBTRACT)
    add(body_8_2.part, mode=Mode.SUBTRACT)

    # Combine17: cut body 8, body 7, body 6, body 5, body 4, body 3
    add(body_8.part, mode=Mode.SUBTRACT)
    add(body_7.part, mode=Mode.SUBTRACT)
    add(body_6.part, mode=Mode.SUBTRACT)
    add(body_5.part, mode=Mode.SUBTRACT)
    add(body_4.part, mode=Mode.SUBTRACT)
    add(body_3.part, mode=Mode.SUBTRACT)

    # Fillet14
    # the kernel refuses this fillet: 15 mm, written as the material it takes off along each edge
    with BuildSketch(Plane(origin=(-51, 34.5, 51), x_dir=(-1, 0, 0), z_dir=(0, -1, 0))) as fillet14_piece_1_section:
        with BuildLine():
            CenterArc((FILLET14_R, -FILLET14_R), FILLET14_R, 90, 90)
            Line((0, -FILLET14_R), (0, 0))
            Line((0, 0), (FILLET14_R, 0))
        make_face()
    fillet14_piece_1 = extrude(amount=76.5, mode=Mode.PRIVATE)
    fillet14_piece_1 = split(fillet14_piece_1, bisect_by=Plane(origin=(-64.35249566, 0, 51.045676814), z_dir=(0, -1, 0)), keep=Keep.TOP, mode=Mode.PRIVATE)
    add(fillet14_piece_1, mode=Mode.SUBTRACT)
    with BuildSketch(Plane(origin=(-51, 34.5, -51), x_dir=(-1, 0, 0), z_dir=(0, -1, 0))) as fillet14_piece_2_section:
        with BuildLine():
            CenterArc((FILLET14_R, FILLET14_R), FILLET14_R, 180, 90)
            Line((0, FILLET14_R), (0, 0))
            Line((0, 0), (FILLET14_R, 0))
        make_face()
    fillet14_piece_2 = extrude(amount=76.5, mode=Mode.PRIVATE)
    fillet14_piece_2 = split(fillet14_piece_2, bisect_by=Plane(origin=(-64.35249566, 0, -51.045676814), z_dir=(0, -1, 0)), keep=Keep.TOP, mode=Mode.PRIVATE)
    add(fillet14_piece_2, mode=Mode.SUBTRACT)
    with BuildSketch(Plane(origin=(51, 34.5, -51), x_dir=(0, 0, -1), z_dir=(0, -1, 0))) as fillet14_piece_3_section:
        with BuildLine():
            CenterArc((FILLET14_R, FILLET14_R), FILLET14_R, 180, 90)
            Line((0, FILLET14_R), (0, 0))
            Line((0, 0), (FILLET14_R, 0))
        make_face()
    fillet14_piece_3 = extrude(amount=76.5, mode=Mode.PRIVATE)
    fillet14_piece_3 = split(fillet14_piece_3, bisect_by=Plane(origin=(51.045676814, 0, -64.35249566), z_dir=(0, -1, 0)), keep=Keep.TOP, mode=Mode.PRIVATE)
    add(fillet14_piece_3, mode=Mode.SUBTRACT)
    with BuildSketch(Plane(origin=(51, 34.5, 51), x_dir=(1, 0, 0), z_dir=(0, -1, 0))) as fillet14_piece_4_section:
        with BuildLine():
            CenterArc((FILLET14_R, FILLET14_R), FILLET14_R, 180, 90)
            Line((0, FILLET14_R), (0, 0))
            Line((0, 0), (FILLET14_R, 0))
        make_face()
    fillet14_piece_4 = extrude(amount=76.5, mode=Mode.PRIVATE)
    fillet14_piece_4 = split(fillet14_piece_4, bisect_by=Plane(origin=(64.35249566, 0, 51.045676814), z_dir=(0, -1, 0)), keep=Keep.TOP, mode=Mode.PRIVATE)
    add(fillet14_piece_4, mode=Mode.SUBTRACT)

    # Sketch42 → Cut-Extrude1 (cut)
    with BuildSketch(Plane.XY.offset(75)):
        with Locations((60, -8)):
            Circle(SKETCH42_R)
        with Locations((50, -8)):
            Circle(SKETCH42_R)
        with Locations((40, -8)):
            Circle(SKETCH42_R)
        with Locations((30, -8)):
            Circle(SKETCH42_R)
        with Locations((20, -8)):
            Circle(SKETCH42_R)
        with Locations((10, -8)):
            Circle(SKETCH42_R)
        with Locations((0, -8)):
            Circle(SKETCH42_R)
        with Locations((-10, -8)):
            Circle(SKETCH42_R)
        with Locations((-20, -8)):
            Circle(SKETCH42_R)
        with Locations((-30, -8)):
            Circle(SKETCH42_R)
        with Locations((-40, -8)):
            Circle(SKETCH42_R)
        with Locations((-50, -8)):
            Circle(SKETCH42_R)
        with Locations((-60, -8)):
            Circle(SKETCH42_R)
    extrude(amount=-CUT_EXTRUDE1_DEPTH, mode=Mode.SUBTRACT)

    # Sketch45 → Cut-Extrude2 (cut, through all)
    with BuildSketch(Plane.ZY.offset(75)):
        with Locations((-60, -8)):
            Circle(SKETCH45_R)
        with Locations((-50, -8)):
            Circle(SKETCH45_R)
        with Locations((-40, -8)):
            Circle(SKETCH45_R)
        with Locations((-30, -8)):
            Circle(SKETCH45_R)
        with Locations((-20, -8)):
            Circle(SKETCH45_R)
        with Locations((-10, -8)):
            Circle(SKETCH45_R)
        with Locations((0, -8)):
            Circle(SKETCH45_R)
        with Locations((10, -8)):
            Circle(SKETCH45_R)
        with Locations((20, -8)):
            Circle(SKETCH45_R)
        with Locations((30, -8)):
            Circle(SKETCH45_R)
        with Locations((40, -8)):
            Circle(SKETCH45_R)
        with Locations((50, -8)):
            Circle(SKETCH45_R)
        with Locations((60, -8)):
            Circle(SKETCH45_R)
    extrude(amount=-CUT_EXTRUDE2_DEPTH, mode=Mode.SUBTRACT)


solid = body_12_2_1.part
